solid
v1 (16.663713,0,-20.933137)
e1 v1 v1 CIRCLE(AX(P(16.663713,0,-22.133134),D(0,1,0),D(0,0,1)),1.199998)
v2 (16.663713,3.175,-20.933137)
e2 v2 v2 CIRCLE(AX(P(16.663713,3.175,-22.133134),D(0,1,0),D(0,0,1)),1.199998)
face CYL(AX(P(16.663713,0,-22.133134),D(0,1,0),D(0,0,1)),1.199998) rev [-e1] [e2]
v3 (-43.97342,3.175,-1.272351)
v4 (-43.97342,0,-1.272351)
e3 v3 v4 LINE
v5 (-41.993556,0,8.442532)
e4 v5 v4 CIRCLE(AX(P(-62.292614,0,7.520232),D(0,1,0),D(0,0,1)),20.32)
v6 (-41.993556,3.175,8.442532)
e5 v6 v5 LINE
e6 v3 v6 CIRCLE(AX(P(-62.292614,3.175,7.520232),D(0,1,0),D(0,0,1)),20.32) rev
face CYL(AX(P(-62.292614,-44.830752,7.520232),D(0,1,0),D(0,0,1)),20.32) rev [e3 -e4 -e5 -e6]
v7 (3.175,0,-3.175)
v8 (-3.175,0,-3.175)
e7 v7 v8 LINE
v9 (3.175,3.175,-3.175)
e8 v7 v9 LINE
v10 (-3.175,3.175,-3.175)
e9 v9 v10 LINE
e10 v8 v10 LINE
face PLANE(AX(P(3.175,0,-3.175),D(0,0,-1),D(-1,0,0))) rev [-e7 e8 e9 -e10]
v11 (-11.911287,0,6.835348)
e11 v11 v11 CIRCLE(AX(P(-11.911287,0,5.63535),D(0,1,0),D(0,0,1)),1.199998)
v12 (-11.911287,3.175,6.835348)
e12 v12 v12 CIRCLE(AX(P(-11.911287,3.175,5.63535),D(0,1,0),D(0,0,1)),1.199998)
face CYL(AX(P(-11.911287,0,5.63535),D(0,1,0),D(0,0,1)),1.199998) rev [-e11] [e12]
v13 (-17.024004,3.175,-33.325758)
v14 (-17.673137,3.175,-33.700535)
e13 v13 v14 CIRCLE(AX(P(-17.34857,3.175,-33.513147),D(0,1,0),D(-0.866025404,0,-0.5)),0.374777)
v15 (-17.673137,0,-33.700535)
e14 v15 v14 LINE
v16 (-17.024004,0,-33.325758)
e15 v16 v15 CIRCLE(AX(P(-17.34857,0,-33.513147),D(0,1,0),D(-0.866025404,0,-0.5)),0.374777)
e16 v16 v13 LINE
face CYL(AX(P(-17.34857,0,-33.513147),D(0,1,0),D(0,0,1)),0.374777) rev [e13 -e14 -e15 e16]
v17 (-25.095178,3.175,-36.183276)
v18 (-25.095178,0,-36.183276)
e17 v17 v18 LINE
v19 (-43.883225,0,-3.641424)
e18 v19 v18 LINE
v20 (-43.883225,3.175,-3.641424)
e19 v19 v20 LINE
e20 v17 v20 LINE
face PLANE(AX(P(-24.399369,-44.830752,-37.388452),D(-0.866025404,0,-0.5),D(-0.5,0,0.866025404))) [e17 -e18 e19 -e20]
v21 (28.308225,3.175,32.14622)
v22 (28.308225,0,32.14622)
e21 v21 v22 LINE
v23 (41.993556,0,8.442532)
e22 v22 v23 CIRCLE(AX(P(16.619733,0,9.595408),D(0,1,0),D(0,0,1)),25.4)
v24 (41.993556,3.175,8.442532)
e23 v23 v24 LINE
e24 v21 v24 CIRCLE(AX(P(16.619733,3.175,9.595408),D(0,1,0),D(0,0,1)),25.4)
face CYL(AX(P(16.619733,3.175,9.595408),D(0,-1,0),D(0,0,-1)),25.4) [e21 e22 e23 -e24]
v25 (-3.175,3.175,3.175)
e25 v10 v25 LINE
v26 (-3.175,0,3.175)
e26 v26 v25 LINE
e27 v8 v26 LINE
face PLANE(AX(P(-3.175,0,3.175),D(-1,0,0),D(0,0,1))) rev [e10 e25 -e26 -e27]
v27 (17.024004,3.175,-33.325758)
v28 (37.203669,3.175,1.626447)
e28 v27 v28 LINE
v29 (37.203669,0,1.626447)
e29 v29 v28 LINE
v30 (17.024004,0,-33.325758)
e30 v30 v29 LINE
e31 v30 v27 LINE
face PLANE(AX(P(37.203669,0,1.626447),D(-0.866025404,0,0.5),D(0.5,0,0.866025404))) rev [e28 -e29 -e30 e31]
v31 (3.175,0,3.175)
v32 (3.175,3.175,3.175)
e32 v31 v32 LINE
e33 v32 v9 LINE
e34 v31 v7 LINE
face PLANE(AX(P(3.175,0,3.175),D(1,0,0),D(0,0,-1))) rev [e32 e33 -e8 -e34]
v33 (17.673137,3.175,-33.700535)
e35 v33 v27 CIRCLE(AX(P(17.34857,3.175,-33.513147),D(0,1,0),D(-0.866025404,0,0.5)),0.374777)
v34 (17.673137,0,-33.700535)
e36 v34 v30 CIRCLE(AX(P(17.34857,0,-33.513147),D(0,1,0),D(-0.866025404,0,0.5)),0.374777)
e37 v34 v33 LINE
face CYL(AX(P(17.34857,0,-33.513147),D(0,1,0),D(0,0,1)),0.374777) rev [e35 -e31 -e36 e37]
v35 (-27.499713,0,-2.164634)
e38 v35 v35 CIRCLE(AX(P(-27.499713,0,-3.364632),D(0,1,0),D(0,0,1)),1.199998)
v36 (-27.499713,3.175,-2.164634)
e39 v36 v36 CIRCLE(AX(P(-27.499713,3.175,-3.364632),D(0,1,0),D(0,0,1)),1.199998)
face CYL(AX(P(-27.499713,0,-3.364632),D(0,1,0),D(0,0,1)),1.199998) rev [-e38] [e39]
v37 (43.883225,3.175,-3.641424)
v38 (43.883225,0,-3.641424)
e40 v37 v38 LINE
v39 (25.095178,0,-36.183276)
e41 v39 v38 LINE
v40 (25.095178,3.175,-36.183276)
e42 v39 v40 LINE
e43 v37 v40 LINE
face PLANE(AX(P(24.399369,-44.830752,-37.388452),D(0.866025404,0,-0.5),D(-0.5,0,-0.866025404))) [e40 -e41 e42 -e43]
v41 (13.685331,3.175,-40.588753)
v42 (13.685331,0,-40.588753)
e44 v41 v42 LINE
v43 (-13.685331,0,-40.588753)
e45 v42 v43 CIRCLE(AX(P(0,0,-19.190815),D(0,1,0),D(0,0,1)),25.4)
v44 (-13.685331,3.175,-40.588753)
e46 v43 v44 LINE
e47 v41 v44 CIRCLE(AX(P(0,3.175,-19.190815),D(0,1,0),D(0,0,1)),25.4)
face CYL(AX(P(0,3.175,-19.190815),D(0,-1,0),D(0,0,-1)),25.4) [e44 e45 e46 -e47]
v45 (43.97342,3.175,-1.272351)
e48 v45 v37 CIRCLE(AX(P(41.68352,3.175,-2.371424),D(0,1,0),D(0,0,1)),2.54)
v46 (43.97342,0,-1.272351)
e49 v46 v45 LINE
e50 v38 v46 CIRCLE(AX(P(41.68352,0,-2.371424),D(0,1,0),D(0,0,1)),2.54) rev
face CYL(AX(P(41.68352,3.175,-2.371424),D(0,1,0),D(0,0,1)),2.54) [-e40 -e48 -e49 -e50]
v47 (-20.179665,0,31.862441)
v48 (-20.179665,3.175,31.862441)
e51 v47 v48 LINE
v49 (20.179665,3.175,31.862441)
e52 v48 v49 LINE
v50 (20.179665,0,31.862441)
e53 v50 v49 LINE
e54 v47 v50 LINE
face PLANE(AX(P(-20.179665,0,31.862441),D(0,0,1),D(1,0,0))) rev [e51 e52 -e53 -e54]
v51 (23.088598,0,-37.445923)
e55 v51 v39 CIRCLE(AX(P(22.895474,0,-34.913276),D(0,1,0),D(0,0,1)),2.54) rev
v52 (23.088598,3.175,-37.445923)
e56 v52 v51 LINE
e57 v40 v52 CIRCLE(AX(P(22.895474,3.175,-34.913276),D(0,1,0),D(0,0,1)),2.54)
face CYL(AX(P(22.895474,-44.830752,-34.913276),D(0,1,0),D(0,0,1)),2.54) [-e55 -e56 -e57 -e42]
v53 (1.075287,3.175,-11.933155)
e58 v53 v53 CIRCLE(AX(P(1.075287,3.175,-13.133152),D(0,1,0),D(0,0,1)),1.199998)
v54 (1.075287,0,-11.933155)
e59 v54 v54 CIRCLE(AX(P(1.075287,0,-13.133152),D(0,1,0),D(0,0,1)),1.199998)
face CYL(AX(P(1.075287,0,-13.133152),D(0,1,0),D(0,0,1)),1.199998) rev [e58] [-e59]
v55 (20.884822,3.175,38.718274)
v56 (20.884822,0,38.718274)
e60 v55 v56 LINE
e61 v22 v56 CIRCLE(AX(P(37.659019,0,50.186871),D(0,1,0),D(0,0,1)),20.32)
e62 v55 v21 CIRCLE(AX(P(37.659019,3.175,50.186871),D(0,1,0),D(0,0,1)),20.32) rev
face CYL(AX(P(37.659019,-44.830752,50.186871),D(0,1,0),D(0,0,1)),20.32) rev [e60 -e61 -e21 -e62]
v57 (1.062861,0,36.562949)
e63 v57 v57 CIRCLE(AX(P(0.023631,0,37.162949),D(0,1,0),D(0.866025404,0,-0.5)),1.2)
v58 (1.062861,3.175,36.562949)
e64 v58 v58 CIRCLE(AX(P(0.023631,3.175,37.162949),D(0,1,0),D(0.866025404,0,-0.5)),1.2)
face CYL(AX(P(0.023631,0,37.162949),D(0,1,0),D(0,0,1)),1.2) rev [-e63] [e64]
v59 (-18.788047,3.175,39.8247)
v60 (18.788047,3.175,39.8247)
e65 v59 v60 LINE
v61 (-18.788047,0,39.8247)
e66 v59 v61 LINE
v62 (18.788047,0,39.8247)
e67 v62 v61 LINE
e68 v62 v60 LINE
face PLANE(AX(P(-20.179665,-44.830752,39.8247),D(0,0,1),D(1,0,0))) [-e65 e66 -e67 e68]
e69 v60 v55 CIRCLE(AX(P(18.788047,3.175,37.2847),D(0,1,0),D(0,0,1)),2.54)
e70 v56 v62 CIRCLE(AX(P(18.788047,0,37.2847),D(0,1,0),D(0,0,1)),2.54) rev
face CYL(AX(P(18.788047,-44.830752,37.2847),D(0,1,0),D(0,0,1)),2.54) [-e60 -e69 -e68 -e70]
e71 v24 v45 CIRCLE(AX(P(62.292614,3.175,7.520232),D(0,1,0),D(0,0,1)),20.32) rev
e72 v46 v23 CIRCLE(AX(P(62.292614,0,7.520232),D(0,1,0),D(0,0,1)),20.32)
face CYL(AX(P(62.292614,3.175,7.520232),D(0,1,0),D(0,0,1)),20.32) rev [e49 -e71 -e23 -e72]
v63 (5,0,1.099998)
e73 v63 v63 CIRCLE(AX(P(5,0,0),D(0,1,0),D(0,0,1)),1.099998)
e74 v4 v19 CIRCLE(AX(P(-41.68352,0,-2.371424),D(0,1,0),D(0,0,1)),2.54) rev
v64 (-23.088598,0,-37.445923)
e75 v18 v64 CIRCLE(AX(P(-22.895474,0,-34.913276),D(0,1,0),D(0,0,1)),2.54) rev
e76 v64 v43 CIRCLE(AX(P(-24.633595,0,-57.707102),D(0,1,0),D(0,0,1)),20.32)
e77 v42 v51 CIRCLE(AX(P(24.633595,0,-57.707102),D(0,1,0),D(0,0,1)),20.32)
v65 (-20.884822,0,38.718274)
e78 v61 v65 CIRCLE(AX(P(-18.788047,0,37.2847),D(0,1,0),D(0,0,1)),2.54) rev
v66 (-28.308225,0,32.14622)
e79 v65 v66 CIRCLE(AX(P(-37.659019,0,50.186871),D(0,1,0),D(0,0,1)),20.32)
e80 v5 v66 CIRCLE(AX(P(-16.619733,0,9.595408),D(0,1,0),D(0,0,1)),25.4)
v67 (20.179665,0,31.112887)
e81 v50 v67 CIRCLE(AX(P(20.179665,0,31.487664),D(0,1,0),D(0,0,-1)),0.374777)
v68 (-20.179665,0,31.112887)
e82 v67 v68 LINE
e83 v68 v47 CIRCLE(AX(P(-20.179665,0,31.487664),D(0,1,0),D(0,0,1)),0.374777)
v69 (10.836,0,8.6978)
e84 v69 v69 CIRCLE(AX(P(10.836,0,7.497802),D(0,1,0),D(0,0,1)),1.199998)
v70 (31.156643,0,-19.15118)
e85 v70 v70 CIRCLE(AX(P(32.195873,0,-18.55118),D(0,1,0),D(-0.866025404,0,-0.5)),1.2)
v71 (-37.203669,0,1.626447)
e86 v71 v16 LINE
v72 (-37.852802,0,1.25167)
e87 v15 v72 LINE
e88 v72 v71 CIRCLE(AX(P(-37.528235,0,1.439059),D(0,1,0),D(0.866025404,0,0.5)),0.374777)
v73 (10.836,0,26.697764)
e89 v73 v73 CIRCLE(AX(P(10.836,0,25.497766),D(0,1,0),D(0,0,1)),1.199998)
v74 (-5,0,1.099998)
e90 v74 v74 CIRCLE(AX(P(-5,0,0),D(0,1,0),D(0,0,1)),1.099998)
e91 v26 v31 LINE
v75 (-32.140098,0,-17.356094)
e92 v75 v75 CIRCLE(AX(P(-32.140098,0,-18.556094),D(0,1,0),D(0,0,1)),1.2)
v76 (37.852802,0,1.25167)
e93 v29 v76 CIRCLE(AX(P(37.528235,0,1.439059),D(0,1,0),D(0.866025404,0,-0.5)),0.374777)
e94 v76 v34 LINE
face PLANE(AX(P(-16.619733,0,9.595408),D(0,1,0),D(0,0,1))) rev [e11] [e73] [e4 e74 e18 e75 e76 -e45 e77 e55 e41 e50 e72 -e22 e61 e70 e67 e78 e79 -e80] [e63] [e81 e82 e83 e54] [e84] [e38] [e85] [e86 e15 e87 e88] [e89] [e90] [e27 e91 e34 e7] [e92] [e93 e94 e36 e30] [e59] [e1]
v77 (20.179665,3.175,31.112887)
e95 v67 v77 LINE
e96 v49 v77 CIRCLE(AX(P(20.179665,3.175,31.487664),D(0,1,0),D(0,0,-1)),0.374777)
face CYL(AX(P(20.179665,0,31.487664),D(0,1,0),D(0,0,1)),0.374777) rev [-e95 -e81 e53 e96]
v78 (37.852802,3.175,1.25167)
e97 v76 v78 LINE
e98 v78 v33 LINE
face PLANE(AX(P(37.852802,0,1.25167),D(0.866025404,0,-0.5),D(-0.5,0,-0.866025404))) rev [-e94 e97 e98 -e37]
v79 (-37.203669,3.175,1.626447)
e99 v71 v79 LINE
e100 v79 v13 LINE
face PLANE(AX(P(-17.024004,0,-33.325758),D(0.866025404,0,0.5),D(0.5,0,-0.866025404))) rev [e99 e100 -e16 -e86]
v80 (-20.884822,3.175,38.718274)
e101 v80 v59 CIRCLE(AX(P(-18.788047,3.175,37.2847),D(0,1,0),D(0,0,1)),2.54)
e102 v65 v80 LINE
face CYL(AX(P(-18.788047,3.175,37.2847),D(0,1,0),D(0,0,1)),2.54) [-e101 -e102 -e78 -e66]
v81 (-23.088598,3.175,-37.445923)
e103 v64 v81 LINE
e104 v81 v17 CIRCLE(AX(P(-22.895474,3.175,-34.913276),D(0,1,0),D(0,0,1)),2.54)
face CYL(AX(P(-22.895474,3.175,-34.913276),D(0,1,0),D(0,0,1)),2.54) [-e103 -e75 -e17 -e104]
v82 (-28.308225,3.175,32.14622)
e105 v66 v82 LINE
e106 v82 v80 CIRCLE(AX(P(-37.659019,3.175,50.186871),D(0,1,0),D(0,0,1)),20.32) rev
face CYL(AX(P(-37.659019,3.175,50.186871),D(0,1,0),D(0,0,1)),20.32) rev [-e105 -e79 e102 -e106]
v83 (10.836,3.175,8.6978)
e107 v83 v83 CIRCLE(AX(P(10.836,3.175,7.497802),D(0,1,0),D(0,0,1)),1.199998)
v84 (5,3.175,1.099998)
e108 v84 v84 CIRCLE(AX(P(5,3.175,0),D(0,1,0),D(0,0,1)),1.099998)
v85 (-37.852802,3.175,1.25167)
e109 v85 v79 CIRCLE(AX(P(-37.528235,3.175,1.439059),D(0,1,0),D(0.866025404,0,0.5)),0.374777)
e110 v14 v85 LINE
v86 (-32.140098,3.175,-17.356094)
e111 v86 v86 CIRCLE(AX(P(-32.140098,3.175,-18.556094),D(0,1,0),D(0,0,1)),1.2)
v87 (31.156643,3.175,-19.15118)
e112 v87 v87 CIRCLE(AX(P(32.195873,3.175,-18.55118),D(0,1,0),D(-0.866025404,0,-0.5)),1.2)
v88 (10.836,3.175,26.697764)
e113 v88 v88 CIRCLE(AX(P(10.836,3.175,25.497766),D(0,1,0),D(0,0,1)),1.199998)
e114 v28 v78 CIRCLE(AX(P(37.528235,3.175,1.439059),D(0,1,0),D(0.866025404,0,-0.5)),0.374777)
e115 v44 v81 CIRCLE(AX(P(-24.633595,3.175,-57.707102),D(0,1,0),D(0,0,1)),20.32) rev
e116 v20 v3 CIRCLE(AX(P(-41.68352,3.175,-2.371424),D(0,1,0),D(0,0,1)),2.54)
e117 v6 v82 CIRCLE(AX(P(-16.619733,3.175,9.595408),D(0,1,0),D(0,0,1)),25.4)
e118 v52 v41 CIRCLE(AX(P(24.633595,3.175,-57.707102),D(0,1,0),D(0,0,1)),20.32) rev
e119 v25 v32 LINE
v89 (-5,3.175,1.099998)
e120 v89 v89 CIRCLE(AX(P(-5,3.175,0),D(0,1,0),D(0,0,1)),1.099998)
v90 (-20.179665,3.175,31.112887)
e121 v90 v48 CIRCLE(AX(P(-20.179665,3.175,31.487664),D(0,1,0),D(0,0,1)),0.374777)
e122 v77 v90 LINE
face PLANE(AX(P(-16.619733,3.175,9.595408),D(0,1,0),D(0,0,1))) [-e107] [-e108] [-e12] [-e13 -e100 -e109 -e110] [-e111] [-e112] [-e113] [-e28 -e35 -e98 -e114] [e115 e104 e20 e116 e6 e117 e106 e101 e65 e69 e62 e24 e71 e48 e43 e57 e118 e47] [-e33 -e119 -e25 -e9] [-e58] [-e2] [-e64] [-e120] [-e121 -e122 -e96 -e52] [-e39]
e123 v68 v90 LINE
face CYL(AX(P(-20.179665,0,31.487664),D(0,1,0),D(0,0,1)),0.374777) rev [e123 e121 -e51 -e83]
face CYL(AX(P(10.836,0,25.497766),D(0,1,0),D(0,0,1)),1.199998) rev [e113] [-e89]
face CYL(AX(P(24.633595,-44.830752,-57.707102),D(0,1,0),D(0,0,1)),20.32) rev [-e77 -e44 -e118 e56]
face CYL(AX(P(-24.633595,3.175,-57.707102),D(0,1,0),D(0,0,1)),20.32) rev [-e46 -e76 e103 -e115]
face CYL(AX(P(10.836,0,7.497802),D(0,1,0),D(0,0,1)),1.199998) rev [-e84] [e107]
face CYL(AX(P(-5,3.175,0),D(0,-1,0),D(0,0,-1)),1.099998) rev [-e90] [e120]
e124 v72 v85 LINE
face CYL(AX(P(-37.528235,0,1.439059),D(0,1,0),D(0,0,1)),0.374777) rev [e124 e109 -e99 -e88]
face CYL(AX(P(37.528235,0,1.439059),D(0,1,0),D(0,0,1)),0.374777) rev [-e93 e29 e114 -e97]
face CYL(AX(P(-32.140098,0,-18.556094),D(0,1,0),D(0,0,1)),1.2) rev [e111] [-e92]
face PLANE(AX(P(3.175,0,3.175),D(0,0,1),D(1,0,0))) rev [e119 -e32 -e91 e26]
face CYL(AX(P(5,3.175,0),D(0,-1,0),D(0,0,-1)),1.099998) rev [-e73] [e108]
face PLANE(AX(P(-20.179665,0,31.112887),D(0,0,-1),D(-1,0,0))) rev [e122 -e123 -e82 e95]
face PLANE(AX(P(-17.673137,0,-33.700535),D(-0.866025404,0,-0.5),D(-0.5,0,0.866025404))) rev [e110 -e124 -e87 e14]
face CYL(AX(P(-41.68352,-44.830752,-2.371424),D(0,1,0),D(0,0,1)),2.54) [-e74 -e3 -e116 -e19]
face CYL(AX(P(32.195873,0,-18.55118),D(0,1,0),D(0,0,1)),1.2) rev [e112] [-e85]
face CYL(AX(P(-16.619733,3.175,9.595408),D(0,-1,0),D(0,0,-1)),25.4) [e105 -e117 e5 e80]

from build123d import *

# Parameters (mm, degrees)
SKETCH4_R           = 1.0999978
BOSS_EXTRUDE4_DEPTH = 3.175
SKETCH1_R           = 1.1999976
CUT_EXTRUDE7_DEPTH  = 62.35209393
CUT_EXTRUDE9_DEPTH  = 62.35209393
CIRPATTERN1_COUNT   = 3
SKETCH9_W           = 40.35933
SKETCH9_H           = 5.08
BOSS_EXTRUDE5_DEPTH = 3.175
SKETCH10_R          = 1.2
CUT_EXTRUDE10_DEPTH = 64.132493246
CIRPATTERN2_COUNT   = 3
FILLET3_R           = 20.32
FILLET4_R           = 2.54
SKETCH13_W          = 6.35
SKETCH13_H          = 6.35
CUT_EXTRUDE12_DEPTH = 63.881962359


with BuildPart() as part:
    # Sketch4 → Boss-Extrude4 (new body)
    with BuildSketch(Plane(origin=(0, 0, 0), x_dir=(1, 0, 0), z_dir=(0, 1, 0))):
        with BuildLine():
            Line((-19.99996, 34.84845233), (-40.179625, -0.10375273))
            ThreePointArc((-40.179625, -0.10375273), (-38.616778752, -22.295407608), (-20.179665, -34.744699599))
            Line((-20.179665, -34.744699599), (0, -34.744699599))
            Line((0, -34.744699599), (20.179665, -34.744699599))
            ThreePointArc((20.179665, -34.744699599), (38.616778752, -22.295407608), (40.179625, -0.10375273))
            Line((40.179625, -0.10375273), (30.0897925, 17.3723498))
            Line((30.0897925, 17.3723498), (19.99996, 34.84845233))
            ThreePointArc((19.99996, 34.84845233), (0, 44.590815215), (-19.99996, 34.84845233))
        make_face()
        with Locations(Location((-5.000000033, 0, 0), (0, 0, 270))):
            Circle(SKETCH4_R, mode=Mode.SUBTRACT)
        with Locations(Location((5.000000033, 0, 0), (0, 0, 270))):
            Circle(SKETCH4_R, mode=Mode.SUBTRACT)
    extrude(amount=BOSS_EXTRUDE4_DEPTH)

    # Sketch1 → Cut-Extrude7 (cut, through all)
    with BuildSketch(Plane(origin=(0, 3.175, 0), x_dir=(1, 0, 0), z_dir=(0, 1, 0))):
        with Locations(Location((10.835999918, -25.497765942, 0), (0, 0, 270))):
            Circle(SKETCH1_R)
        with Locations(Location((10.835999918, -7.497801942, 0), (0, 0, 270))):
            Circle(SKETCH1_R)
        with Locations(Location((-11.911286913, -5.635350233, 0), (0, 0, 270))):
            Circle(SKETCH1_R)
        with Locations(Location((-27.499713005, 3.364631767, 0), (0, 0, 270))):
            Circle(SKETCH1_R)
        with Locations(Location((1.075286995, 13.133152175, 0), (0, 0, 270))):
            Circle(SKETCH1_R)
        with Locations(Location((16.663713087, 22.133134175, 0), (0, 0, 270))):
            Circle(SKETCH1_R)
    extrude(amount=-CUT_EXTRUDE7_DEPTH, mode=Mode.SUBTRACT)

    # Sketch6 → Cut-Extrude9 (cut, through all)
    with BuildSketch(Plane(origin=(0, 3.175, 0), x_dir=(1, 0, 0), z_dir=(0, 1, 0))):
        with BuildLine():
            Line((-20.179665, -31.862440942), (20.179665, -31.862440942))
            ThreePointArc((20.179665, -31.862440942), (20.554442, -31.487663942), (20.179665, -31.112886942))
            Line((20.179665, -31.112886942), (-20.179665, -31.112886942))
            ThreePointArc((-20.179665, -31.112886942), (-20.554442, -31.487663942), (-20.179665, -31.862440942))
        make_face()
    cut_extrude9 = extrude(amount=-CUT_EXTRUDE9_DEPTH, mode=Mode.SUBTRACT)

    # CirPattern1: Cut-Extrude9 ×3 about axis
    cirpattern1_axis = Axis((0, 0, -0.195474675), (0, 1, 0))
    for i in range(1, CIRPATTERN1_COUNT):
        add(cut_extrude9.rotate(cirpattern1_axis, i * 360 / CIRPATTERN1_COUNT), mode=Mode.SUBTRACT)

    # Sketch9 → Boss-Extrude5 (add)
    with BuildSketch(Plane(origin=(0, 3.175, 0), x_dir=(1, 0, 0), z_dir=(0, 1, 0))):
        Polygon((-19.99996, 34.84845233), (-24.399369051, 37.38845233), (-44.579034051, 2.43624727), (-40.179625, -0.10375273), align=None)
        with Locations((0, -37.284699599)):
            Rectangle(SKETCH9_W, SKETCH9_H)
        Polygon((19.99996, 34.84845233), (24.399369051, 37.38845233), (44.579034051, 2.43624727), (40.179625, -0.10375273), align=None)
    extrude(amount=-BOSS_EXTRUDE5_DEPTH)

    # Sketch10 → Cut-Extrude10 (cut, through all)
    with BuildSketch(Plane(origin=(0, 3.175, 0), x_dir=(1, 0, 0), z_dir=(0, 1, 0))):
        with Locations(Location((-32.140098419, 18.556094474, 0), (0, 0, 270))):
            Circle(SKETCH10_R)
    cut_extrude10 = extrude(amount=-CUT_EXTRUDE10_DEPTH, mode=Mode.SUBTRACT)

    # CirPattern2: Cut-Extrude10 ×3 about axis
    cirpattern2_axis = Axis((0.026468548, 0, 0.018558184), (0, 1, 0))
    for i in range(1, CIRPATTERN2_COUNT):
        add(cut_extrude10.rotate(cirpattern2_axis, i * 360 / CIRPATTERN2_COUNT), mode=Mode.SUBTRACT)

    # Fillet3
    # the kernel refuses this fillet: 20.32 mm, written as the material it adds along each edge
    with BuildSketch(Plane(origin=(-19.99996, 0, -34.84845233), x_dir=(0.7399559261961443, 0, -0.6726553555032522), z_dir=(0, 1, 0)), Plane(origin=(-20.179665, 0, 34.744699599), x_dir=(-0.9525145889555402, 0, -0.3044929520150809), z_dir=(0, 1, 0))) as fillet3_piece_1:
        with BuildLine():
            CenterArc((11.947307306, 20.031233261), FILLET3_R, 228.388118158, 31.941023553)
            Line((-1.546824196, 4.838774112), (-1.816706826, 4.534924929))
            ThreePointArc((-1.816706826, 4.534924929), (-1.160514027, 2.29564112), (-0.387101929, -0.123745936))
            Line((-0.387101929, -0.123745936), (0.068270327, -0.400624665))
            ThreePointArc((0.068270327, -0.400624665), (4.266895466, -0.045441577), (8.465520605, -0.400624665))
            Line((8.465520605, -0.400624665), (8.533790933, 0))
        make_face()
    extrude(amount=3.175)
    with BuildSketch(Plane(origin=(19.99996, 0, -34.84845233), x_dir=(-0.7399559261961431, 0, -0.6726553555032532), z_dir=(0, 1, 0)), Plane(origin=(20.179665, 0, 34.744699599), x_dir=(0.9525145889555428, 0, -0.3044929520150728), z_dir=(0, 1, 0))) as fillet3_piece_2:
        with BuildLine():
            CenterArc((11.947307306, -20.031233261), FILLET3_R, 99.67085829, 31.941023553)
            Line((-1.546824196, -4.838774112), (-1.816706826, -4.534924929))
            ThreePointArc((-1.816706826, -4.534924929), (-1.160514027, -2.29564112), (-0.387101929, 0.123745936))
            Line((-0.387101929, 0.123745936), (0.068270327, 0.400624665))
            ThreePointArc((0.068270327, 0.400624665), (4.266895466, 0.045441577), (8.465520605, 0.400624665))
            Line((8.465520605, 0.400624665), (8.533790933, 0))
        make_face()
    extrude(amount=3.175)
    with BuildSketch(Plane(origin=(40.179625, 0, 0.10375273), x_dir=(0.8660254037844389, 0, -0.4999999999999995), z_dir=(0, 1, 0))) as fillet3_piece_3:
        with BuildLine():
            CenterArc((15.442171046, -17.479353856), FILLET3_R, 120.660456863, 31.941023553)
            Line((-2.598479193, -8.128560362), (-2.959292198, -7.941544493))
            ThreePointArc((-2.959292198, -7.941544493), (-1.342523361, -4.050443541), (-0.402388672, 0.056958904))
            Line((-0.402388672, 0.056958904), (0, 0.4064))
            ThreePointArc((0, 0.4064), (2.54, 0.4064), (4.872756579, 0.349587077))
            Line((4.872756579, 0.349587077), (5.08, 0))
        make_face()
    extrude(amount=3.175)
    with BuildSketch(Plane(origin=(-40.179625, 0, 0.10375273), x_dir=(-0.8660254037844382, 0, -0.500000000000001), z_dir=(0, 1, 0))) as fillet3_piece_4:
        with BuildLine():
            CenterArc((15.442171046, 17.479353856), FILLET3_R, 207.398519584, 31.941023553)
            Line((-2.598479193, 8.128560362), (-2.959292198, 7.941544493))
            ThreePointArc((-2.959292198, 7.941544493), (-1.342523361, 4.050443541), (-0.402388672, -0.056958904))
            Line((-0.402388672, -0.056958904), (0, -0.4064))
            ThreePointArc((0, -0.4064), (2.54, -0.4064), (4.872756579, -0.349587077))
            Line((4.872756579, -0.349587077), (5.08, 0))
        make_face()
    extrude(amount=3.175)

    # Fillet4
    fillet4_edges = [part.edges().sort_by_distance(p)[0] for p in [
        (-44.579034051, 1.5875, -2.43624727),
        (-24.399369051, 1.5875, -37.38845233),
        (20.179665, 1.5875, 39.824699599),
        (-20.179665, 1.5875, 39.824699599),
        (24.399369051, 1.5875, -37.38845233),
        (44.579034051, 1.5875, -2.43624727),
    ]]
    fillet(fillet4_edges, radius=FILLET4_R)

    # Sketch13 → Cut-Extrude12 (cut, through all)
    with BuildSketch(Plane(origin=(0, 3.175, 0), x_dir=(1, 0, 0), z_dir=(0, 1, 0))):
        Rectangle(SKETCH13_W, SKETCH13_H)
    extrude(amount=-CUT_EXTRUDE12_DEPTH, mode=Mode.SUBTRACT)


solid = part.part
